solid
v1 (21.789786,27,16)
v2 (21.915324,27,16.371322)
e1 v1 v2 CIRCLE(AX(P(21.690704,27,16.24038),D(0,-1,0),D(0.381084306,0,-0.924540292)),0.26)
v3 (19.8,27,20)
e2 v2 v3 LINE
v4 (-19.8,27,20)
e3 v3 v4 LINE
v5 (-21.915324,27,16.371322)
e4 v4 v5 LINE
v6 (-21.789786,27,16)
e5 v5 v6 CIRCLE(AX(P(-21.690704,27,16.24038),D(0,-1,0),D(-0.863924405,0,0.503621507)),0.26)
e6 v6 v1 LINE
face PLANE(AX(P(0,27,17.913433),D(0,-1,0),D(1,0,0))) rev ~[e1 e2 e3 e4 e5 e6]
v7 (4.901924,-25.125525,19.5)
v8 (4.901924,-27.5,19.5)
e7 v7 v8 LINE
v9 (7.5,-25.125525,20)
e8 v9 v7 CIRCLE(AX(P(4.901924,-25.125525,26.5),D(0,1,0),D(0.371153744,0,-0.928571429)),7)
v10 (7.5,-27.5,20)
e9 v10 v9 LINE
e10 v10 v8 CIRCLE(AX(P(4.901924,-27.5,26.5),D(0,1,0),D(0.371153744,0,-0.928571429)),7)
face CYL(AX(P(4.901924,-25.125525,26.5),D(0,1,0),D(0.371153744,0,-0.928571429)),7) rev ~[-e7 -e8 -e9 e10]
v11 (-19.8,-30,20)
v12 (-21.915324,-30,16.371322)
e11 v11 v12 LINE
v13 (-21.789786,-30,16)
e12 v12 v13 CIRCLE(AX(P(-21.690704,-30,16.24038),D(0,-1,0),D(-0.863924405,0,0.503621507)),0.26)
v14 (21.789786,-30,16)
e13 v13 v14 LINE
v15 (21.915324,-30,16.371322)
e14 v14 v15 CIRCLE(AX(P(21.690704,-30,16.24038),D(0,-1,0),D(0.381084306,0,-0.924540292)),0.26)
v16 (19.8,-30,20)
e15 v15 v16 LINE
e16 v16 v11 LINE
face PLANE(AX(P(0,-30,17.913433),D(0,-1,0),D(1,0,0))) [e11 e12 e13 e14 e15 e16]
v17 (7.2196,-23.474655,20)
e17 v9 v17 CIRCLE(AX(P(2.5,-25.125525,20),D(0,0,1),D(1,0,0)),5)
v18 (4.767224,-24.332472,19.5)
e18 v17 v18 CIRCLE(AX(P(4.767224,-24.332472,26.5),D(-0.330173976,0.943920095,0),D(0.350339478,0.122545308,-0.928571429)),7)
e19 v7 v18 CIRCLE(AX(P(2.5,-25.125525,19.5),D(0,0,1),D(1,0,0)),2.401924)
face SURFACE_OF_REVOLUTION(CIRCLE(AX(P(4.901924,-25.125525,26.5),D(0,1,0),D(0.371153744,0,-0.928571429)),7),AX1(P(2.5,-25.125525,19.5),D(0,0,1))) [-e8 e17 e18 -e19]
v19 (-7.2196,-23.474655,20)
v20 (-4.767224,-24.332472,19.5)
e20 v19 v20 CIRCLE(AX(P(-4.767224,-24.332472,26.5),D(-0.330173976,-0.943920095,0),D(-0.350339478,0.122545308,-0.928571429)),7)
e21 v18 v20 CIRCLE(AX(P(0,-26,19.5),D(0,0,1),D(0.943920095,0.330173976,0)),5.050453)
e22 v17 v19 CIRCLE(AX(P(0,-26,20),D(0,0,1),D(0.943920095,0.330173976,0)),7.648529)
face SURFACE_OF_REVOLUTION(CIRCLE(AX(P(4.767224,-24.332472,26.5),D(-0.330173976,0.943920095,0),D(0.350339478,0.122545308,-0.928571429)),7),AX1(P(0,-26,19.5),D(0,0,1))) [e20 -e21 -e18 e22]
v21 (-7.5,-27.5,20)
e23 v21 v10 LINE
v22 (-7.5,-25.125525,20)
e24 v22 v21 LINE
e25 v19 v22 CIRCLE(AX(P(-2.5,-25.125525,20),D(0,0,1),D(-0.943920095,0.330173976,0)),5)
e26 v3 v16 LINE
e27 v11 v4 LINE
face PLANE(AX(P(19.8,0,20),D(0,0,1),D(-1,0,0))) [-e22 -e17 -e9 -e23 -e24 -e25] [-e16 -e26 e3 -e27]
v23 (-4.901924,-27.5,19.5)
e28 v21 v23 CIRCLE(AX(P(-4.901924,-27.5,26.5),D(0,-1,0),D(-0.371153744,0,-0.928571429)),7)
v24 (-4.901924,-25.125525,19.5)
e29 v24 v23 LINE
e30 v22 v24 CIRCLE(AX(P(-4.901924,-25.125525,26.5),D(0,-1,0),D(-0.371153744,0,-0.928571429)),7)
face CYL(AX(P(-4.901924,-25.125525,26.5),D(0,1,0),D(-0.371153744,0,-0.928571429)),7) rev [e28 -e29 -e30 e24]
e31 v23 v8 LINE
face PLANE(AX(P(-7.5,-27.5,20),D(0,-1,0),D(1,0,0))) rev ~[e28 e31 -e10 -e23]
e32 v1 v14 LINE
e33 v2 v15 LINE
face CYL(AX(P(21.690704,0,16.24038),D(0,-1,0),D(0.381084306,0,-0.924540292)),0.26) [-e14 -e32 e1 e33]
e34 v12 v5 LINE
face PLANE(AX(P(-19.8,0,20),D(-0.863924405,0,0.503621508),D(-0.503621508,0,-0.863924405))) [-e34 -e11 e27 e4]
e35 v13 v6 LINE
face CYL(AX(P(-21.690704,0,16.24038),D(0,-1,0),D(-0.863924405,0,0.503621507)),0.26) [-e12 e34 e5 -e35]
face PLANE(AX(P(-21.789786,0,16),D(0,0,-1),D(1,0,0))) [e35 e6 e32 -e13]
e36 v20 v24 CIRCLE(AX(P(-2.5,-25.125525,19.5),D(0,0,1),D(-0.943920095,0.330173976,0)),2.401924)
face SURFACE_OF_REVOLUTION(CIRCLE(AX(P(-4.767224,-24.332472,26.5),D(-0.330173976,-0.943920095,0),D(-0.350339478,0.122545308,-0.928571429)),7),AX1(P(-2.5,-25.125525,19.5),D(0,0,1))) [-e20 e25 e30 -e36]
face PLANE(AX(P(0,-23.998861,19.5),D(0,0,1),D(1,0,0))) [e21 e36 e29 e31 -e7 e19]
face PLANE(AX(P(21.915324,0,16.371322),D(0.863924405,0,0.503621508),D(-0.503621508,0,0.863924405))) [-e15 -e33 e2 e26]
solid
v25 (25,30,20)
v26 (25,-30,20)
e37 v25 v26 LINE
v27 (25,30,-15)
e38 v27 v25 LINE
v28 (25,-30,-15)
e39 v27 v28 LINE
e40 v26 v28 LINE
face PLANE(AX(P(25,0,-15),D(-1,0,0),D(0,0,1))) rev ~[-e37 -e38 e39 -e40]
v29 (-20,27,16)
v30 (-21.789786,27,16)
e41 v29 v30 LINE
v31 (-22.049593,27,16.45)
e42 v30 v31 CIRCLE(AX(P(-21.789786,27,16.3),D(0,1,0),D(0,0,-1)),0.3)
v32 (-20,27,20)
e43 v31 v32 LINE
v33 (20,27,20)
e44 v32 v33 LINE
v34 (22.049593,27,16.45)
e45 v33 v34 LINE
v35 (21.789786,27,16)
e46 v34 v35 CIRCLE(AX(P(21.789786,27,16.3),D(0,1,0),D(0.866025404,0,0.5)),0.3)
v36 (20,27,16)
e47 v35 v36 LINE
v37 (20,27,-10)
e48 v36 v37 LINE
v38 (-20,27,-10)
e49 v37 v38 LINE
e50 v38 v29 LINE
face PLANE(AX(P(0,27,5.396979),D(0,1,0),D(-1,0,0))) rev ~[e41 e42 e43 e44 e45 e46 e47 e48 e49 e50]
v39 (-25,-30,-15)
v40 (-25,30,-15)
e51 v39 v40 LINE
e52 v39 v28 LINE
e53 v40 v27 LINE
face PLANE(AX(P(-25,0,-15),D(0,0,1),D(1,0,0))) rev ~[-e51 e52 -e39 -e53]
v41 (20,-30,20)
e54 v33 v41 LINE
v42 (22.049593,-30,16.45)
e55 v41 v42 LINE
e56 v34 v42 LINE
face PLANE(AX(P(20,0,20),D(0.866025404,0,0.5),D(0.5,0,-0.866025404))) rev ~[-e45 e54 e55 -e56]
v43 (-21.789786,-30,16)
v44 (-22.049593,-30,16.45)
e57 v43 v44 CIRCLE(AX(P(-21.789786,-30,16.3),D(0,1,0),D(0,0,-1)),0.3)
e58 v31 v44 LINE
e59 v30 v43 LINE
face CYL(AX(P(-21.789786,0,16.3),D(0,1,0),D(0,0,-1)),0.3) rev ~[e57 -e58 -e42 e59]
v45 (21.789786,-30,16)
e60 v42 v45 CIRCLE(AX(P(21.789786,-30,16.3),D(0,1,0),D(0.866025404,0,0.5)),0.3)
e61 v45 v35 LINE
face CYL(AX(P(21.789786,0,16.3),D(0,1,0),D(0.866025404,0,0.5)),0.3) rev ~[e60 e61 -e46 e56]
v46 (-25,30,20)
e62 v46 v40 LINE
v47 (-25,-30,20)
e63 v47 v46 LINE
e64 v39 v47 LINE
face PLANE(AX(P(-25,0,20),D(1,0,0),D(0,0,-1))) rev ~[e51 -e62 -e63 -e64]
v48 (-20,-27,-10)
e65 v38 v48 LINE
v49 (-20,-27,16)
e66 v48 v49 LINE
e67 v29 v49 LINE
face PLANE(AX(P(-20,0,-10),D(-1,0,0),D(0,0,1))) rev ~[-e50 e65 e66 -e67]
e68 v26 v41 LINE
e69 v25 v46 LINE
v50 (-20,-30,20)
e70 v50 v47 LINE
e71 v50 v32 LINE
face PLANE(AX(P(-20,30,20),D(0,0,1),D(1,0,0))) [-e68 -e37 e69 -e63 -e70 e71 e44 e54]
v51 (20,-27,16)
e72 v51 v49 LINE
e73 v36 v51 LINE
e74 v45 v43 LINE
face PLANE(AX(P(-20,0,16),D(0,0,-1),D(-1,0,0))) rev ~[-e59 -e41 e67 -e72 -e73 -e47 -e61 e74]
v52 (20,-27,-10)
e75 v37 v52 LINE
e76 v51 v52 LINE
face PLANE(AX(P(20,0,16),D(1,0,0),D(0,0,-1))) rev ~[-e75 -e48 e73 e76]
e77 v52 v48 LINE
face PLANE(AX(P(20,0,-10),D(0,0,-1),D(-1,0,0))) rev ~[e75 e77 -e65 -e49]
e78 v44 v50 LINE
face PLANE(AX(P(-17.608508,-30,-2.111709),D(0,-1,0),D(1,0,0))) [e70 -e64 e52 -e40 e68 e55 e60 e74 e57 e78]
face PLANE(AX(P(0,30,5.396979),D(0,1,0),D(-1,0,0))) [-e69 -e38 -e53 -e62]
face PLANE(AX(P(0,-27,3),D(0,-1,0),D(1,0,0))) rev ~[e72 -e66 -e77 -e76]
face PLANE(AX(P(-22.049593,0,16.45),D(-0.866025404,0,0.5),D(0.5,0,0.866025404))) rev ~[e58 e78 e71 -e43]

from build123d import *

# Parameters (mm, degrees)
F1_DEPTH      = 30
F1_DEPTH_BACK = 30
F2_W          = 40
F2_H          = 26
F3_DEPTH      = 3
F5_DEPTH      = 3
F6_DEPTH      = 30
F6_DEPTH_BACK = 27
F8_DEPTH      = 0.5
F9_T1_DEPTH   = 2.3744754405
F9_T4_ANGLE   = 141.4413290381
F9_T6_ANGLE   = 19.2793354809
F9_T8_ANGLE   = 19.2793354809


# Not quite as in the source:
# - a fillet or chamfer that OpenCascade refuses, or shapes differently, is made with other operations: its cross-section is extruded or revolved along the edge and cut away or added


with BuildPart() as f1:
    # F0 (on Front) → F1 (new body, two sides)
    with BuildSketch(Plane.XZ) as f1_sk:
        with BuildLine():
            Line((-25, -15), (0, -15))
            Line((0, -15), (0, -10))
            Line((0, -10), (-20, -10))
            Line((-20, -10), (-20, 15.9987840325))
            Line((-20, 15.9987840325), (-20, 16))
            Line((-20, 16), (-21.7897858345, 16))
            ThreePointArc((-21.7897858345, 16), (-22.0495934556, 16.15), (-22.0495934556, 16.45))
            Line((-22.0495934556, 16.45), (-20, 20))
            Line((-20, 20), (-25, 20))
            Line((-25, 20), (-25, -15))
        make_face()
        with BuildLine():
            Line((0, -10), (0, -15))
            Line((0, -15), (25, -15))
            Line((25, -15), (25, 20))
            Line((25, 20), (20, 20))
            Line((20, 20), (22.0495934556, 16.45))
            ThreePointArc((22.0495934556, 16.45), (22.0495934556, 16.15), (21.7897858345, 16))
            Line((21.7897858345, 16), (20, 16))
            Line((20, 16), (20, 15.9987840325))
            Line((20, 15.9987840325), (20, -10))
            Line((20, -10), (0, -10))
        make_face()
    extrude(amount=-F1_DEPTH)
    extrude(f1_sk.sketch, amount=F1_DEPTH_BACK)

    # F2 (on face) → F3 (join)
    with BuildSketch(Plane.XZ.offset(30)):
        with Locations((0, 3)):
            Rectangle(F2_W, F2_H)
        Polygon((-21.7897858345, 16), (-25, 16), (-25, -15), (25, -15), (25, 16), (21.7897858345, 16), (20, 16), (20, -10), (-20, -10), (-20, 16), align=None)
    extrude(amount=-F3_DEPTH)

    # F4 (on face) → F5 (join)
    with BuildSketch(Plane(origin=(0, 30, 0), x_dir=(-1, 0, 0), z_dir=(0, 1, 0))):
        with BuildLine():
            Line((20, 20), (-20, 20))
            Line((-20, 20), (-22.0495934556, 16.45))
            ThreePointArc((-22.0495934556, 16.45), (-22.0495934556, 16.15), (-21.7897858345, 16))
            Line((-21.7897858345, 16), (-20, 16))
            Line((-20, 16), (-20, -10))
            Line((-20, -10), (20, -10))
            Line((20, -10), (20, 16))
            Line((20, 16), (21.7897858345, 16))
            ThreePointArc((21.7897858345, 16), (22.0495934556, 16.15), (22.0495934556, 16.45))
            Line((22.0495934556, 16.45), (20, 20))
        make_face()
    extrude(amount=-F5_DEPTH)


with BuildPart() as f6:
    # F0 (on Front) → F6 (new body, two sides)
    with BuildSketch(Plane.XZ) as f6_sk:
        with BuildLine():
            Line((-21.7897858345, 16), (-20, 16))
            Line((-20, 16), (0, 16))
            Line((0, 16), (20, 16))
            Line((20, 16), (21.7897858345, 16))
            ThreePointArc((21.7897858345, 16), (21.9370082159, 16.1571086836), (21.9153242604, 16.3713220681))
            Line((21.9153242604, 16.3713220681), (19.8, 20))
            Line((19.8, 20), (0, 20))
            Line((0, 20), (-19.8, 20))
            Line((-19.8, 20), (-21.9153242604, 16.3713220681))
            ThreePointArc((-21.9153242604, 16.3713220681), (-21.9370082159, 16.1571086836), (-21.7897858345, 16))
        make_face()
    extrude(amount=F6_DEPTH)
    extrude(f6_sk.sketch, amount=-F6_DEPTH_BACK)

    # F7 (on face) → F8 (cut)
    with BuildSketch(Plane.XY.offset(20)):
        with BuildLine():
            Line((-7.5, -27.5), (7.5, -27.5))
            Line((7.5, -27.5), (7.5, -25.1255245595))
            ThreePointArc((7.5, -25.1255245595), (7.4294017066, -24.2882678396), (7.219600474, -23.474654678))
            ThreePointArc((7.219600474, -23.474654678), (0, -18.3514707296), (-7.219600474, -23.474654678))
            ThreePointArc((-7.219600474, -23.474654678), (-7.4294017066, -24.2882678396), (-7.5, -25.1255245595))
            Line((-7.5, -25.1255245595), (-7.5, -27.5))
        make_face()
    extrude(amount=-F8_DEPTH, mode=Mode.SUBTRACT)

    # F9: fillet of radius 7 on 1 edges, made by hand

    # F9_s2 → F9_t1 (join)
    with BuildSketch(Plane.XZ.offset(25.1255245595)):
        with BuildLine():
            ThreePointArc((-7.5, 20), (-6.2247994442, 19.6261364576), (-4.9019237886, 19.5))
            Line((-4.9019237886, 19.5), (-7.5, 19.5))
            Line((-7.5, 19.5), (-7.5, 20))
        make_face()
        with BuildLine():
            ThreePointArc((7.5, 20), (6.2247994442, 19.6261364576), (4.9019237886, 19.5))
            Line((4.9019237886, 19.5), (7.5, 19.5))
            Line((7.5, 19.5), (7.5, 20))
        make_face()
    extrude(amount=F9_T1_DEPTH)

    # F9_s3 → F9_t4 (revolve)
    with BuildSketch(Plane(origin=(8.1031041262, -23.1656137798, 0), x_dir=(0, 0, 1), z_dir=(0.3301739763, -0.9439200948, 0))):
        with BuildLine():
            ThreePointArc((20, 0.9359941133), (19.6261364576, 2.2111946691), (19.5, 3.5340703247))
            Line((19.5, 3.5340703247), (19.5, 0.9359941133))
            Line((19.5, 0.9359941133), (20, 0.9359941133))
        make_face()
    revolve(axis=Axis((0, -26, 19.5), (0, 0, 1)), revolution_arc=F9_T4_ANGLE)

    # F9_s5 → F9_t6 (revolve)
    with BuildSketch(Plane.XZ.offset(25.1255245595)):
        with BuildLine():
            ThreePointArc((7.5, 20), (6.2247994442, 19.6261364576), (4.9019237886, 19.5))
            Line((4.9019237886, 19.5), (7.5, 19.5))
            Line((7.5, 19.5), (7.5, 20))
        make_face()
    revolve(axis=Axis((2.5, -25.1255245595, 19.5), (0, 0, 1)), revolution_arc=F9_T6_ANGLE)

    # F9_s7 → F9_t8 (revolve)
    with BuildSketch(Plane(origin=(-8.1031041262, -23.1656137798, 0), x_dir=(0, 0, 1), z_dir=(0.3301739763, 0.9439200948, 0))):
        with BuildLine():
            ThreePointArc((20, 0.9359941133), (19.6261364576, 2.2111946691), (19.5, 3.5340703247))
            Line((19.5, 3.5340703247), (19.5, 0.9359941133))
            Line((19.5, 0.9359941133), (20, 0.9359941133))
        make_face()
    revolve(axis=Axis((-2.5, -25.1255245595, 19.5), (0, 0, 1)), revolution_arc=F9_T8_ANGLE)


solid = Compound([f1.part, f6.part])
